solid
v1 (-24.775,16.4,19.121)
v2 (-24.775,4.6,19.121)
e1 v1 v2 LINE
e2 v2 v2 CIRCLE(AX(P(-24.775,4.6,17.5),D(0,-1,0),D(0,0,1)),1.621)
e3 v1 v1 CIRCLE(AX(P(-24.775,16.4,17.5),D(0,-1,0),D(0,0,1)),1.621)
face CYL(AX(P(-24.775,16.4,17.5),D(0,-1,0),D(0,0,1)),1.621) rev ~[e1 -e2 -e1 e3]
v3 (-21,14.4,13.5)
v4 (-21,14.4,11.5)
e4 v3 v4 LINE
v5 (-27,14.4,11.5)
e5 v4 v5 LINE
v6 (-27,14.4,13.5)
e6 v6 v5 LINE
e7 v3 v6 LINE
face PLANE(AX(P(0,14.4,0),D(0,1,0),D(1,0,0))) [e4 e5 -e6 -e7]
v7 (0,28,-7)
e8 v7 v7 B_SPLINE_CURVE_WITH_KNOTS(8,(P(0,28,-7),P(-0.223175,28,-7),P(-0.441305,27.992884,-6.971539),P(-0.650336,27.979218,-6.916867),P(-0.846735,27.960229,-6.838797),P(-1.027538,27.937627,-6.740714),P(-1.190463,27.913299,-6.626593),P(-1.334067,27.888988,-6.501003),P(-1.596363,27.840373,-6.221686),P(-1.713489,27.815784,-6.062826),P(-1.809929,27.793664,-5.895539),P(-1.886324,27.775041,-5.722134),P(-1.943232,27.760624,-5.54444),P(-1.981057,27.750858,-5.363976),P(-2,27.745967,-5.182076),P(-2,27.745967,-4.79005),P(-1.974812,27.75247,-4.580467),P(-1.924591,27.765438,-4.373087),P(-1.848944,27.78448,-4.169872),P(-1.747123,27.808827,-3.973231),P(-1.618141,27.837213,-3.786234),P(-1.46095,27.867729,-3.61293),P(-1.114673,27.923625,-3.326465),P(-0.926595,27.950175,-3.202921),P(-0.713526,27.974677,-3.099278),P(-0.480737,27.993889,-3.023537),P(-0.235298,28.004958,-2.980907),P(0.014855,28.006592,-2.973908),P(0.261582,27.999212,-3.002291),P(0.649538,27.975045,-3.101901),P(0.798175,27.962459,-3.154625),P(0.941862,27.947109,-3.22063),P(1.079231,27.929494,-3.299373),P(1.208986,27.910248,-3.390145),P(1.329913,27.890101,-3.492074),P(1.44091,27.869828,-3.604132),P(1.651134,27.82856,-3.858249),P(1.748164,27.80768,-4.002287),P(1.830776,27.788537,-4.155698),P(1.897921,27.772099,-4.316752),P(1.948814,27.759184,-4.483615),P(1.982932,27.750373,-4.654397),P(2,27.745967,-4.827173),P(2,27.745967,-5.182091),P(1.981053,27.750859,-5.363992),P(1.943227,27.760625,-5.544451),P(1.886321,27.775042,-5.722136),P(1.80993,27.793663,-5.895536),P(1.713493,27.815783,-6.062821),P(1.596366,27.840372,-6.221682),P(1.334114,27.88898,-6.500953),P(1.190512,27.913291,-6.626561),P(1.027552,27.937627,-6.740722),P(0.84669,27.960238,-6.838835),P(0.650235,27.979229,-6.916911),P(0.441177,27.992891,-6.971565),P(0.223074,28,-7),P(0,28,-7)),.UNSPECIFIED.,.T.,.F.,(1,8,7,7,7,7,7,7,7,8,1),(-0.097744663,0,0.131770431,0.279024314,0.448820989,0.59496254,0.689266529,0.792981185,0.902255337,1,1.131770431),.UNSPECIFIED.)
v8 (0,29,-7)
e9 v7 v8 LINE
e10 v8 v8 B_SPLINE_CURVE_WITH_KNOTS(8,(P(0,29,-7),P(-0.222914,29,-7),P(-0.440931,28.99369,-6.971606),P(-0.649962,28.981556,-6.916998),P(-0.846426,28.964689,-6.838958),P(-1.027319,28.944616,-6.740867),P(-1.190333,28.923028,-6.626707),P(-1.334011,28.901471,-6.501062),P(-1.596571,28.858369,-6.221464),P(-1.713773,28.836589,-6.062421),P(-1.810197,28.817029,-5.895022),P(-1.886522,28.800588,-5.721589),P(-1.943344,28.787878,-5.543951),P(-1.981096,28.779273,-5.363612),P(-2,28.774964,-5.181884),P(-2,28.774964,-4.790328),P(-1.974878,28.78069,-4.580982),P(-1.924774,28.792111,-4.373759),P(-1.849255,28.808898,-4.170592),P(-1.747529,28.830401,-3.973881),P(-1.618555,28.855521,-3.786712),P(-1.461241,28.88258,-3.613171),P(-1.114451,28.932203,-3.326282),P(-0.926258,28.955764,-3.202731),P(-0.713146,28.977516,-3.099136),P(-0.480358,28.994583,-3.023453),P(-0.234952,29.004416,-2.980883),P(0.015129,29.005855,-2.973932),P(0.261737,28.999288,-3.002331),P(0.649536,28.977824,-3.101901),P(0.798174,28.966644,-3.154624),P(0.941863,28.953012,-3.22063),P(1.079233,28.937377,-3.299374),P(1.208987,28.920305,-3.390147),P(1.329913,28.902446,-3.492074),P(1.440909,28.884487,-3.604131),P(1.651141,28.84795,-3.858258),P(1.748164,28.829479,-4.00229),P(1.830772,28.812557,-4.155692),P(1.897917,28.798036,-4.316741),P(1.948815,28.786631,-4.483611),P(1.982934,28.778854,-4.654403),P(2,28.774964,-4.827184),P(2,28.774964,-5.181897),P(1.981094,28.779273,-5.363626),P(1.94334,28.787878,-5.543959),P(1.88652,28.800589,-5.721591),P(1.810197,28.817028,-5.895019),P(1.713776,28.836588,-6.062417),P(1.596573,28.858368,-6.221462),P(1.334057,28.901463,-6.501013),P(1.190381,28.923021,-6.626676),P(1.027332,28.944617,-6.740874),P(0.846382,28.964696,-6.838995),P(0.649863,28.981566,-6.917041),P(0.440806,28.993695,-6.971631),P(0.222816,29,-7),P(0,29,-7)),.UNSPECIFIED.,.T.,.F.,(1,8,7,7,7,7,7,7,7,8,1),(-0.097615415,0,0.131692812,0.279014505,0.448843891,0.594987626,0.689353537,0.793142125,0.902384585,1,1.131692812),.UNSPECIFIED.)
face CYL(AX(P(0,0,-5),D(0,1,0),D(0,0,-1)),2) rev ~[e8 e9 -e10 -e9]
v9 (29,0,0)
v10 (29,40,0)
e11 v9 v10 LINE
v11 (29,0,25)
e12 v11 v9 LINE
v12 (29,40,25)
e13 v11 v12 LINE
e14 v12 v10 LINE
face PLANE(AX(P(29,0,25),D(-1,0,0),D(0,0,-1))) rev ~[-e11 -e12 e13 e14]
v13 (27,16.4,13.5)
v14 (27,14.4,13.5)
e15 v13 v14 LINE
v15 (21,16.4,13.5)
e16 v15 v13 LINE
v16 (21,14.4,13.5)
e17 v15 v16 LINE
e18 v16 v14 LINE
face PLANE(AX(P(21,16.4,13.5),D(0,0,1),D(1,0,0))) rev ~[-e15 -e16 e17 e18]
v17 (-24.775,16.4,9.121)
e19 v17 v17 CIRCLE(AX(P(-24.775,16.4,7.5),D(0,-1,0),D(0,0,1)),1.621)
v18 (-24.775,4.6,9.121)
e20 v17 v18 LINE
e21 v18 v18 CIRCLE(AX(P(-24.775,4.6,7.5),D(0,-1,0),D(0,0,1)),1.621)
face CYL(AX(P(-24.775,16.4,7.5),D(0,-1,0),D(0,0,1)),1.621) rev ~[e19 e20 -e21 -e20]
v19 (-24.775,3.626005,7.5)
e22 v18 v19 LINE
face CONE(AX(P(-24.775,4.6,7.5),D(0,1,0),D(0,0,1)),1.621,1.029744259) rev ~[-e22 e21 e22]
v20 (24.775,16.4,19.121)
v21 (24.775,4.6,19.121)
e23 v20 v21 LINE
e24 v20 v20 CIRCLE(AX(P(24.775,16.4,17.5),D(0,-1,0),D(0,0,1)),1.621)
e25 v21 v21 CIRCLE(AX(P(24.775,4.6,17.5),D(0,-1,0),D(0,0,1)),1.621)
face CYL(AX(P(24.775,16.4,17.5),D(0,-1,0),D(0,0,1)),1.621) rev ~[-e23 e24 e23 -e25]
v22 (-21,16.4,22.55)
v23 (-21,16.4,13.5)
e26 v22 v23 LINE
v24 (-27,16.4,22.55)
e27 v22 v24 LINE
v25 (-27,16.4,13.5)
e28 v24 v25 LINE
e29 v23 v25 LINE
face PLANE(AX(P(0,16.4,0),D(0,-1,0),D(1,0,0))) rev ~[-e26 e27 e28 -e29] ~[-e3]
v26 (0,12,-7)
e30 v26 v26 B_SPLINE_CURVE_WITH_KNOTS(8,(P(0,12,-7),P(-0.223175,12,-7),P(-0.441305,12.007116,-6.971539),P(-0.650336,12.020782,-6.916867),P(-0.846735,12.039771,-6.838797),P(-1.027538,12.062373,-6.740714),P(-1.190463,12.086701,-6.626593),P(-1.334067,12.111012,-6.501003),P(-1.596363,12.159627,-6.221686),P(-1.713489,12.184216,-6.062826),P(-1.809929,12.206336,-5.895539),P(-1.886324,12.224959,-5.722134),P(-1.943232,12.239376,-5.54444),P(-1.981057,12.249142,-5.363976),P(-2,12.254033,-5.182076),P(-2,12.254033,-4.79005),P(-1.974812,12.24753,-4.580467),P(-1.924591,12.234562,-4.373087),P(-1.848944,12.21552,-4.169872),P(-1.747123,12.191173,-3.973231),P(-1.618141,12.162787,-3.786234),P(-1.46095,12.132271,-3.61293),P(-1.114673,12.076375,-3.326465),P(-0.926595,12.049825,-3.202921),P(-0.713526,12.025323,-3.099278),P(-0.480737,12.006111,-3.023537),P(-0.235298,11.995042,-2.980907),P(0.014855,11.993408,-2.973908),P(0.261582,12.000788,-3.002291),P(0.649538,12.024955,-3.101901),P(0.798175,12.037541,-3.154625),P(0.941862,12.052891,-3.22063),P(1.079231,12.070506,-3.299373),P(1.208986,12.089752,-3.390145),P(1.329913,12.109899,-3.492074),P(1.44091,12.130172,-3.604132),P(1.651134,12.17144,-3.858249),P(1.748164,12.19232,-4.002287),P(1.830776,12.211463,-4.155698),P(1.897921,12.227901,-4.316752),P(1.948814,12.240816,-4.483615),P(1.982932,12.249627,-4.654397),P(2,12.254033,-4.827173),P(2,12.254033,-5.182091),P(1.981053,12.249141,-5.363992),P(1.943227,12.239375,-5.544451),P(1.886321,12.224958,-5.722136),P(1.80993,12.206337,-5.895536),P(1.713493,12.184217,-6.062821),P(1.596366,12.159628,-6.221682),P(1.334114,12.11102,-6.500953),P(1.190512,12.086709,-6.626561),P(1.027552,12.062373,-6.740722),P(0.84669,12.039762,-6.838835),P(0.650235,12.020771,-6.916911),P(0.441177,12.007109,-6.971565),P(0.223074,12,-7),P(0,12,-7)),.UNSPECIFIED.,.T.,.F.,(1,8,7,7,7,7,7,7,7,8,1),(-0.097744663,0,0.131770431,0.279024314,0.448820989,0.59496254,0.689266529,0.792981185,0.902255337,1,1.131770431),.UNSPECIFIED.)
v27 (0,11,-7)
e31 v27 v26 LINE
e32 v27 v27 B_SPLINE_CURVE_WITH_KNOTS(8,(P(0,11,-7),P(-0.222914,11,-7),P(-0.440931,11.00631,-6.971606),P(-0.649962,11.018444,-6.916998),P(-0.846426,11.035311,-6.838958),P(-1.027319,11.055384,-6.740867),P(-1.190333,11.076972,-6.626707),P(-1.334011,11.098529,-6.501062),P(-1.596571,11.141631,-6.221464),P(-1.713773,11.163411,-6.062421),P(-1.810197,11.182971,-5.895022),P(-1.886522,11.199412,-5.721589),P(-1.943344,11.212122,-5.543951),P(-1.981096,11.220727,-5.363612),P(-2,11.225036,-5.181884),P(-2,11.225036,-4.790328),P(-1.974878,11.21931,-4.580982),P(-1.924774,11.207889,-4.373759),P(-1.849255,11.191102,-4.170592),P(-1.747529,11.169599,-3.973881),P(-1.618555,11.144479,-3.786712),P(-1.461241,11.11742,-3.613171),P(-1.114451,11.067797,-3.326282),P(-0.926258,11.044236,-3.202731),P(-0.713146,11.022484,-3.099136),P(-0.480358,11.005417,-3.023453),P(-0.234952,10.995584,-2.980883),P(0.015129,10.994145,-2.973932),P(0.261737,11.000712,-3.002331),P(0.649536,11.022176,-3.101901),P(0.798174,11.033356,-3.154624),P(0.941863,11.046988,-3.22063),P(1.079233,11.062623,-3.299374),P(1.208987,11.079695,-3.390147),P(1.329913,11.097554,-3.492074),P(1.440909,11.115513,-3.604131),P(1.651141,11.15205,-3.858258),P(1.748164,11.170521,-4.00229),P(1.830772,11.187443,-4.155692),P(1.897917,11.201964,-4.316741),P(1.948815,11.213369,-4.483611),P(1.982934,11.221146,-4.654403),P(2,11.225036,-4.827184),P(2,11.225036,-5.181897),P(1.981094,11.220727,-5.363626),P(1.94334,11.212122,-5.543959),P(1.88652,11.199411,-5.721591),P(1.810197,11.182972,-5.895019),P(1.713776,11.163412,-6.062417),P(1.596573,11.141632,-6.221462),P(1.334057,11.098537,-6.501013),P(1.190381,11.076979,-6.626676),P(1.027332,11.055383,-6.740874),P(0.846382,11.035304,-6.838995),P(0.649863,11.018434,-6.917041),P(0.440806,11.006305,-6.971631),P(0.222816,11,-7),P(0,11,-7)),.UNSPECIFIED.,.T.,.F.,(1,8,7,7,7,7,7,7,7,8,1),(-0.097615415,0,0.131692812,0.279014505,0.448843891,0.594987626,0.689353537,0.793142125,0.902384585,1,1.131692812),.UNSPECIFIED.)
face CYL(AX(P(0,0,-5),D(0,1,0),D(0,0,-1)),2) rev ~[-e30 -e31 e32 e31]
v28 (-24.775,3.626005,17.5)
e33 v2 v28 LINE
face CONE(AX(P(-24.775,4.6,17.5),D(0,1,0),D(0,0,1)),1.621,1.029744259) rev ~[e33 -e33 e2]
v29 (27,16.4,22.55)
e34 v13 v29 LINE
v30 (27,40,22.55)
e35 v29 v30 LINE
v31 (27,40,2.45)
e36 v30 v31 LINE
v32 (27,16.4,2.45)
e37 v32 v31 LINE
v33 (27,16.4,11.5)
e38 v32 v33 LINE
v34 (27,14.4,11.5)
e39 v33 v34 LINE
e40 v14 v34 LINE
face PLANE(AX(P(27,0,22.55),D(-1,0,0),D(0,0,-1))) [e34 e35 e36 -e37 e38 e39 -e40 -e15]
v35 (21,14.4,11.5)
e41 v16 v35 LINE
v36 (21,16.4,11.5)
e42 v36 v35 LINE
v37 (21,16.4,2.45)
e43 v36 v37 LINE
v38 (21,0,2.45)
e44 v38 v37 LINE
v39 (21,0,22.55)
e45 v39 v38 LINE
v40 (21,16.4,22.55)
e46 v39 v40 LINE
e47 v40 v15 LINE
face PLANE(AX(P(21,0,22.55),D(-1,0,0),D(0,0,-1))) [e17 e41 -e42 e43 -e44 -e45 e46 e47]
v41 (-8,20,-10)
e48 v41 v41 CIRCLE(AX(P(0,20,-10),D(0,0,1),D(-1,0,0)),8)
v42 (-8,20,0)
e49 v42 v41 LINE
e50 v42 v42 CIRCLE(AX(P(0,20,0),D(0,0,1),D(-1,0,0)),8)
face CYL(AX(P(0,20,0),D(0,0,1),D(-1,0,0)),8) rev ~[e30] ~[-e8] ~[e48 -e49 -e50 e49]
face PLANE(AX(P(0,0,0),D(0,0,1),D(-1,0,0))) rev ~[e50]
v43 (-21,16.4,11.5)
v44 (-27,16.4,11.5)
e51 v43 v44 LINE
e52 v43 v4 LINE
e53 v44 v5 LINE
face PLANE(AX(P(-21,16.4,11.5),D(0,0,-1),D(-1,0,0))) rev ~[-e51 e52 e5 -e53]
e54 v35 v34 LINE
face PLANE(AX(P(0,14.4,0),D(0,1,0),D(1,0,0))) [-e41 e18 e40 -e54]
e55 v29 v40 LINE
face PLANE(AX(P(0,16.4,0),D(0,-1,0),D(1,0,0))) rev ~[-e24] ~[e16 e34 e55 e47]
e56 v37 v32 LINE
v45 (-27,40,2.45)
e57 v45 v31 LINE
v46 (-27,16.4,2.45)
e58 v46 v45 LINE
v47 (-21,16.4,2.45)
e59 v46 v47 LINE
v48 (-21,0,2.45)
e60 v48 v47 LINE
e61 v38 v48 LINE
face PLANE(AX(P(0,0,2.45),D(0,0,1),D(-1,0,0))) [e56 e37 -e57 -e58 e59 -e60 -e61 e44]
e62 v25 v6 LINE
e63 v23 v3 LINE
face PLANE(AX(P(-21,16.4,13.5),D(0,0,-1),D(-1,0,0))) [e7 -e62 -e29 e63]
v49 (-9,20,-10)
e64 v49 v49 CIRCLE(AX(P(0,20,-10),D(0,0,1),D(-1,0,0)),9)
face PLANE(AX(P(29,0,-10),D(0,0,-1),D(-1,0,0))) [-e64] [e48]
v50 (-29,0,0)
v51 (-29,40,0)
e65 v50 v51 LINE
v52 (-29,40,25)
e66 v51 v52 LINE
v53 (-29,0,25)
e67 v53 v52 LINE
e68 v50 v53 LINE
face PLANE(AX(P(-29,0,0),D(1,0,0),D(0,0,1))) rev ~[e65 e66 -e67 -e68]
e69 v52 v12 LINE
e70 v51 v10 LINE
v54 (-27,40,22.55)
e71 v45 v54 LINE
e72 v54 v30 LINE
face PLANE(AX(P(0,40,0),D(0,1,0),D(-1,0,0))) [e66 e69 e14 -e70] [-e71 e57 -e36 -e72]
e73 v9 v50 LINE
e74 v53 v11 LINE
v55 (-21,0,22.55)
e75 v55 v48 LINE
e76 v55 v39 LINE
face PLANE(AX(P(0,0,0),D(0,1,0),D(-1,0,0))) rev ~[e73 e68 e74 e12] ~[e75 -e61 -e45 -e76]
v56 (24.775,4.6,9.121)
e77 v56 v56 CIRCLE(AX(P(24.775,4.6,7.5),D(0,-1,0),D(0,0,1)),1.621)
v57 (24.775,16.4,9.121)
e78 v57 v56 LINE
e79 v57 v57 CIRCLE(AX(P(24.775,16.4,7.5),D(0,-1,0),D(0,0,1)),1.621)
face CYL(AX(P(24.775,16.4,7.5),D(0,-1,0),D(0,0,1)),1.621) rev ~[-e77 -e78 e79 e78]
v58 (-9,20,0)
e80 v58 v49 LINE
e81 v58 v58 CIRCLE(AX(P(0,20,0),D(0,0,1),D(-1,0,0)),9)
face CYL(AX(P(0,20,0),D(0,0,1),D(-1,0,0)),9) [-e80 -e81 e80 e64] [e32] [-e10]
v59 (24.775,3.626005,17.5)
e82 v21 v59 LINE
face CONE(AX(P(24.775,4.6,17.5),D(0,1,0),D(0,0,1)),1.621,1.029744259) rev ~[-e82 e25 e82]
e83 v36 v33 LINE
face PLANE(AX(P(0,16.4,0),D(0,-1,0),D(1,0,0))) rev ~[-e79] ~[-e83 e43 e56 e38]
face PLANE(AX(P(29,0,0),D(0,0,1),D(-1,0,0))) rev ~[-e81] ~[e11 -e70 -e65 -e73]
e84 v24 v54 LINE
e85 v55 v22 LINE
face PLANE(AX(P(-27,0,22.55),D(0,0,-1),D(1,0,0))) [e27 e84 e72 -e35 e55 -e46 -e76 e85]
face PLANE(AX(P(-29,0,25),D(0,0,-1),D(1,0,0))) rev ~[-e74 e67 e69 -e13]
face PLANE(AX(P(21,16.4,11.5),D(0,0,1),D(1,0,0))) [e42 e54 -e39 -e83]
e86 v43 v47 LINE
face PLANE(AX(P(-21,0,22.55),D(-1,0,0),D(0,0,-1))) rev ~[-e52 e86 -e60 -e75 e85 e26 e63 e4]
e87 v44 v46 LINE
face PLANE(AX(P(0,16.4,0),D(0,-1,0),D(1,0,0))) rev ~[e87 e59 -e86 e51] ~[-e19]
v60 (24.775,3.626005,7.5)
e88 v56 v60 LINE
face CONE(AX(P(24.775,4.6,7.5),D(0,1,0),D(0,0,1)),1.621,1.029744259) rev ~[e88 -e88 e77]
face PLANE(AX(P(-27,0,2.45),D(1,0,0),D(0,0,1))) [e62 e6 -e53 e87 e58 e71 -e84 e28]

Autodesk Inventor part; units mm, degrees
ref_plane "YZ Plane" through (0, 0, 0) normal (1, 0, 0) x (0, 1, 0)
ref_plane "XZ Plane" through (0, 0, 0) normal (0, 1, 0) x (-1, 0, 0)
ref_plane "XY Plane" through (0, 0, 0) normal (0, 0, 1) x (1, 0, 0)
sketch "Esquisse1" plane through (0, 0, 0) normal (0, 1, 0) x (-1, 0, 0)
  line L0 (0, 0) -> (0, 2.45)
  line L1 (0, 0) -> (2.45, 0) construction
  line L2 (0, 2.45) -> (27, 2.45)
  line L3 (27, 2.45) -> (27, 22.55)
  line L4 (27, 22.55) -> (-27, 22.55)
  line L5 (-27, 22.55) -> (-27, 2.45)
  line L6 (-27, 2.45) -> (0, 2.45)
  line L7 (0, 0) -> (29, 0)
  line L8 (29, 0) -> (29, 25)
  line L9 (29, 25) -> (-29, 25)
  line L10 (-29, 25) -> (-29, 0)
  line L11 (-29, 0) -> (0, 0)
  dimension "d0" = 2.45
  dimension "d1" = 90
  dimension "d2" = 27
  dimension "d3" = 20.1
  dimension "d4" = 54
  dimension "d5" = 29
  dimension "d6" = 25
  dimension "d7" = 58
extrude "Extrusion1" add sketch "Esquisse1" along normal blind 40
sketch "Esquisse2" plane through (29, 0, 0) normal (0, 0, -1) x (-1, 0, 0)
  line L0 (29, 0) -> (29, 40)
  line L1 (58, 40) -> (0, 40) projected
  line L2 (0, 0) -> (0, 40) projected
  line L3 (0, 20) -> (58, 20)
  line L4 (58, 0) -> (58, 40) projected
  circle A0 centre (29, 20) radius 8
  circle A1 centre (29, 20) radius 9
  dimension "d10" = 16
  dimension "d11" = 18
extrude "Extrusion2" add sketch "Esquisse2" along normal blind 10 contours A1 L3 A0 L0 | L0 A0 L3 A1 | A1 L0 A0 L3 | L3 A0 L0 A1
sketch "Esquisse3" plane through (0, 0, 0) normal (0, 1, 0) x (-1, 0, 0)
  line L0 (-9, -10) -> (9, -10) projected
  line L1 (0, -10) -> (0, -5)
  point P0 (0, 0)
  dimension "d14" = 5
hole "Perçage1" at (0, 0, -5) direction (0, 1, 0) diameter 4 end through all
sketch "Esquisse4" plane through (0, 0, 0) normal (0, -1, 0) x (1, 0, 0)
  line L0 (27, 2.45) -> (27, 22.55) projected
  line L1 (27, 22.55) -> (-27, 22.55) projected
  line L2 (-27, 2.45) -> (27, 2.45) projected
  line L3 (-27, 22.55) -> (-27, 2.45) projected
  line L4 (27, 22.55) -> (21, 22.55)
  line L5 (27, 22.55) -> (33, 22.55) construction
  line L6 (21, 22.55) -> (21, 2.45)
  line L7 (-27, 22.55) -> (-21, 22.55)
  line L8 (-21, 22.55) -> (-21, 2.45)
  point P0 (0, 0)
  dimension "d22" = 6
  dimension "d23" = 180
  dimension "d24" = 6
extrude "Extrusion3" add sketch "Esquisse4" against normal blind 16.4 contours L2 L6 L1 L0 | L2 L3 L1 L8
sketch "Esquisse5" plane through (0, 16.4, 0) normal (0, 1, 0) x (1, 0, 0)
  line L0 (-21, -22.55) -> (-21, -2.45) projected
  line L1 (-21, -22.55) -> (-21, -12.5)
  line L2 (-21, -12.5) -> (-21, -11.5)
  line L3 (-27, -22.55) -> (-27, -2.45) projected
  line L4 (-21, -11.5) -> (-27, -11.5)
  line L5 (-21, -12.5) -> (-21, -13.5)
  line L6 (-21, -13.5) -> (-27, -13.5)
  line L7 (0, -14.9752) -> (0, -10.0185)
  line L8 (21, -22.55) -> (21, -2.45)
  line L9 (27, -22.55) -> (27, -2.45)
  line L10 (21, -11.5) -> (27, -11.5)
  line L11 (21, -13.5) -> (27, -13.5)
  point P0 (0, 0)
  dimension "d27" = 10.05
  dimension "d28" = 1
  dimension "d29" = 1
extrude "Extrusion4" cut sketch "Esquisse5" against normal blind 2
sketch "Esquisse6" plane through (0, 16.4, 0) normal (0, 1, 0) x (1, 0, 0)
  line L0 (-27, -22.55) -> (-27, -2.45) projected
  line L1 (-21, -22.55) -> (-21, -13.5) projected
  line L2 (-21, -11.5) -> (-21, -2.45) projected
  line L3 (-27, -12.5) -> (-27, -17.5)
  line L4 (-27, -17.5) -> (-24.775, -17.5)
  line L5 (-24.775, -17.5) -> (-24.775, -7.5)
  line L6 (0, -16.5029) -> (0, -8.8773)
  point P0 (0, 0)
  point P1 (24.775, -17.5)
  point P2 (24.775, -7.5)
  dimension "d32" = 5
  dimension "d33" = 2.225
  dimension "d34" = 10
hole "Perçage2" at (-24.775, 16.4, 17.5) at (-24.775, 16.4, 7.5) at (24.775, 16.4, 17.5) at (24.775, 16.4, 7.5) direction (0, -1, 0) diameter 3.242 depth 11.8 tip angle 118 thread size "M4x0.7" class "6H" standard "ISO Metric profile"
properties part number "Attache servomoteur_bogie"
